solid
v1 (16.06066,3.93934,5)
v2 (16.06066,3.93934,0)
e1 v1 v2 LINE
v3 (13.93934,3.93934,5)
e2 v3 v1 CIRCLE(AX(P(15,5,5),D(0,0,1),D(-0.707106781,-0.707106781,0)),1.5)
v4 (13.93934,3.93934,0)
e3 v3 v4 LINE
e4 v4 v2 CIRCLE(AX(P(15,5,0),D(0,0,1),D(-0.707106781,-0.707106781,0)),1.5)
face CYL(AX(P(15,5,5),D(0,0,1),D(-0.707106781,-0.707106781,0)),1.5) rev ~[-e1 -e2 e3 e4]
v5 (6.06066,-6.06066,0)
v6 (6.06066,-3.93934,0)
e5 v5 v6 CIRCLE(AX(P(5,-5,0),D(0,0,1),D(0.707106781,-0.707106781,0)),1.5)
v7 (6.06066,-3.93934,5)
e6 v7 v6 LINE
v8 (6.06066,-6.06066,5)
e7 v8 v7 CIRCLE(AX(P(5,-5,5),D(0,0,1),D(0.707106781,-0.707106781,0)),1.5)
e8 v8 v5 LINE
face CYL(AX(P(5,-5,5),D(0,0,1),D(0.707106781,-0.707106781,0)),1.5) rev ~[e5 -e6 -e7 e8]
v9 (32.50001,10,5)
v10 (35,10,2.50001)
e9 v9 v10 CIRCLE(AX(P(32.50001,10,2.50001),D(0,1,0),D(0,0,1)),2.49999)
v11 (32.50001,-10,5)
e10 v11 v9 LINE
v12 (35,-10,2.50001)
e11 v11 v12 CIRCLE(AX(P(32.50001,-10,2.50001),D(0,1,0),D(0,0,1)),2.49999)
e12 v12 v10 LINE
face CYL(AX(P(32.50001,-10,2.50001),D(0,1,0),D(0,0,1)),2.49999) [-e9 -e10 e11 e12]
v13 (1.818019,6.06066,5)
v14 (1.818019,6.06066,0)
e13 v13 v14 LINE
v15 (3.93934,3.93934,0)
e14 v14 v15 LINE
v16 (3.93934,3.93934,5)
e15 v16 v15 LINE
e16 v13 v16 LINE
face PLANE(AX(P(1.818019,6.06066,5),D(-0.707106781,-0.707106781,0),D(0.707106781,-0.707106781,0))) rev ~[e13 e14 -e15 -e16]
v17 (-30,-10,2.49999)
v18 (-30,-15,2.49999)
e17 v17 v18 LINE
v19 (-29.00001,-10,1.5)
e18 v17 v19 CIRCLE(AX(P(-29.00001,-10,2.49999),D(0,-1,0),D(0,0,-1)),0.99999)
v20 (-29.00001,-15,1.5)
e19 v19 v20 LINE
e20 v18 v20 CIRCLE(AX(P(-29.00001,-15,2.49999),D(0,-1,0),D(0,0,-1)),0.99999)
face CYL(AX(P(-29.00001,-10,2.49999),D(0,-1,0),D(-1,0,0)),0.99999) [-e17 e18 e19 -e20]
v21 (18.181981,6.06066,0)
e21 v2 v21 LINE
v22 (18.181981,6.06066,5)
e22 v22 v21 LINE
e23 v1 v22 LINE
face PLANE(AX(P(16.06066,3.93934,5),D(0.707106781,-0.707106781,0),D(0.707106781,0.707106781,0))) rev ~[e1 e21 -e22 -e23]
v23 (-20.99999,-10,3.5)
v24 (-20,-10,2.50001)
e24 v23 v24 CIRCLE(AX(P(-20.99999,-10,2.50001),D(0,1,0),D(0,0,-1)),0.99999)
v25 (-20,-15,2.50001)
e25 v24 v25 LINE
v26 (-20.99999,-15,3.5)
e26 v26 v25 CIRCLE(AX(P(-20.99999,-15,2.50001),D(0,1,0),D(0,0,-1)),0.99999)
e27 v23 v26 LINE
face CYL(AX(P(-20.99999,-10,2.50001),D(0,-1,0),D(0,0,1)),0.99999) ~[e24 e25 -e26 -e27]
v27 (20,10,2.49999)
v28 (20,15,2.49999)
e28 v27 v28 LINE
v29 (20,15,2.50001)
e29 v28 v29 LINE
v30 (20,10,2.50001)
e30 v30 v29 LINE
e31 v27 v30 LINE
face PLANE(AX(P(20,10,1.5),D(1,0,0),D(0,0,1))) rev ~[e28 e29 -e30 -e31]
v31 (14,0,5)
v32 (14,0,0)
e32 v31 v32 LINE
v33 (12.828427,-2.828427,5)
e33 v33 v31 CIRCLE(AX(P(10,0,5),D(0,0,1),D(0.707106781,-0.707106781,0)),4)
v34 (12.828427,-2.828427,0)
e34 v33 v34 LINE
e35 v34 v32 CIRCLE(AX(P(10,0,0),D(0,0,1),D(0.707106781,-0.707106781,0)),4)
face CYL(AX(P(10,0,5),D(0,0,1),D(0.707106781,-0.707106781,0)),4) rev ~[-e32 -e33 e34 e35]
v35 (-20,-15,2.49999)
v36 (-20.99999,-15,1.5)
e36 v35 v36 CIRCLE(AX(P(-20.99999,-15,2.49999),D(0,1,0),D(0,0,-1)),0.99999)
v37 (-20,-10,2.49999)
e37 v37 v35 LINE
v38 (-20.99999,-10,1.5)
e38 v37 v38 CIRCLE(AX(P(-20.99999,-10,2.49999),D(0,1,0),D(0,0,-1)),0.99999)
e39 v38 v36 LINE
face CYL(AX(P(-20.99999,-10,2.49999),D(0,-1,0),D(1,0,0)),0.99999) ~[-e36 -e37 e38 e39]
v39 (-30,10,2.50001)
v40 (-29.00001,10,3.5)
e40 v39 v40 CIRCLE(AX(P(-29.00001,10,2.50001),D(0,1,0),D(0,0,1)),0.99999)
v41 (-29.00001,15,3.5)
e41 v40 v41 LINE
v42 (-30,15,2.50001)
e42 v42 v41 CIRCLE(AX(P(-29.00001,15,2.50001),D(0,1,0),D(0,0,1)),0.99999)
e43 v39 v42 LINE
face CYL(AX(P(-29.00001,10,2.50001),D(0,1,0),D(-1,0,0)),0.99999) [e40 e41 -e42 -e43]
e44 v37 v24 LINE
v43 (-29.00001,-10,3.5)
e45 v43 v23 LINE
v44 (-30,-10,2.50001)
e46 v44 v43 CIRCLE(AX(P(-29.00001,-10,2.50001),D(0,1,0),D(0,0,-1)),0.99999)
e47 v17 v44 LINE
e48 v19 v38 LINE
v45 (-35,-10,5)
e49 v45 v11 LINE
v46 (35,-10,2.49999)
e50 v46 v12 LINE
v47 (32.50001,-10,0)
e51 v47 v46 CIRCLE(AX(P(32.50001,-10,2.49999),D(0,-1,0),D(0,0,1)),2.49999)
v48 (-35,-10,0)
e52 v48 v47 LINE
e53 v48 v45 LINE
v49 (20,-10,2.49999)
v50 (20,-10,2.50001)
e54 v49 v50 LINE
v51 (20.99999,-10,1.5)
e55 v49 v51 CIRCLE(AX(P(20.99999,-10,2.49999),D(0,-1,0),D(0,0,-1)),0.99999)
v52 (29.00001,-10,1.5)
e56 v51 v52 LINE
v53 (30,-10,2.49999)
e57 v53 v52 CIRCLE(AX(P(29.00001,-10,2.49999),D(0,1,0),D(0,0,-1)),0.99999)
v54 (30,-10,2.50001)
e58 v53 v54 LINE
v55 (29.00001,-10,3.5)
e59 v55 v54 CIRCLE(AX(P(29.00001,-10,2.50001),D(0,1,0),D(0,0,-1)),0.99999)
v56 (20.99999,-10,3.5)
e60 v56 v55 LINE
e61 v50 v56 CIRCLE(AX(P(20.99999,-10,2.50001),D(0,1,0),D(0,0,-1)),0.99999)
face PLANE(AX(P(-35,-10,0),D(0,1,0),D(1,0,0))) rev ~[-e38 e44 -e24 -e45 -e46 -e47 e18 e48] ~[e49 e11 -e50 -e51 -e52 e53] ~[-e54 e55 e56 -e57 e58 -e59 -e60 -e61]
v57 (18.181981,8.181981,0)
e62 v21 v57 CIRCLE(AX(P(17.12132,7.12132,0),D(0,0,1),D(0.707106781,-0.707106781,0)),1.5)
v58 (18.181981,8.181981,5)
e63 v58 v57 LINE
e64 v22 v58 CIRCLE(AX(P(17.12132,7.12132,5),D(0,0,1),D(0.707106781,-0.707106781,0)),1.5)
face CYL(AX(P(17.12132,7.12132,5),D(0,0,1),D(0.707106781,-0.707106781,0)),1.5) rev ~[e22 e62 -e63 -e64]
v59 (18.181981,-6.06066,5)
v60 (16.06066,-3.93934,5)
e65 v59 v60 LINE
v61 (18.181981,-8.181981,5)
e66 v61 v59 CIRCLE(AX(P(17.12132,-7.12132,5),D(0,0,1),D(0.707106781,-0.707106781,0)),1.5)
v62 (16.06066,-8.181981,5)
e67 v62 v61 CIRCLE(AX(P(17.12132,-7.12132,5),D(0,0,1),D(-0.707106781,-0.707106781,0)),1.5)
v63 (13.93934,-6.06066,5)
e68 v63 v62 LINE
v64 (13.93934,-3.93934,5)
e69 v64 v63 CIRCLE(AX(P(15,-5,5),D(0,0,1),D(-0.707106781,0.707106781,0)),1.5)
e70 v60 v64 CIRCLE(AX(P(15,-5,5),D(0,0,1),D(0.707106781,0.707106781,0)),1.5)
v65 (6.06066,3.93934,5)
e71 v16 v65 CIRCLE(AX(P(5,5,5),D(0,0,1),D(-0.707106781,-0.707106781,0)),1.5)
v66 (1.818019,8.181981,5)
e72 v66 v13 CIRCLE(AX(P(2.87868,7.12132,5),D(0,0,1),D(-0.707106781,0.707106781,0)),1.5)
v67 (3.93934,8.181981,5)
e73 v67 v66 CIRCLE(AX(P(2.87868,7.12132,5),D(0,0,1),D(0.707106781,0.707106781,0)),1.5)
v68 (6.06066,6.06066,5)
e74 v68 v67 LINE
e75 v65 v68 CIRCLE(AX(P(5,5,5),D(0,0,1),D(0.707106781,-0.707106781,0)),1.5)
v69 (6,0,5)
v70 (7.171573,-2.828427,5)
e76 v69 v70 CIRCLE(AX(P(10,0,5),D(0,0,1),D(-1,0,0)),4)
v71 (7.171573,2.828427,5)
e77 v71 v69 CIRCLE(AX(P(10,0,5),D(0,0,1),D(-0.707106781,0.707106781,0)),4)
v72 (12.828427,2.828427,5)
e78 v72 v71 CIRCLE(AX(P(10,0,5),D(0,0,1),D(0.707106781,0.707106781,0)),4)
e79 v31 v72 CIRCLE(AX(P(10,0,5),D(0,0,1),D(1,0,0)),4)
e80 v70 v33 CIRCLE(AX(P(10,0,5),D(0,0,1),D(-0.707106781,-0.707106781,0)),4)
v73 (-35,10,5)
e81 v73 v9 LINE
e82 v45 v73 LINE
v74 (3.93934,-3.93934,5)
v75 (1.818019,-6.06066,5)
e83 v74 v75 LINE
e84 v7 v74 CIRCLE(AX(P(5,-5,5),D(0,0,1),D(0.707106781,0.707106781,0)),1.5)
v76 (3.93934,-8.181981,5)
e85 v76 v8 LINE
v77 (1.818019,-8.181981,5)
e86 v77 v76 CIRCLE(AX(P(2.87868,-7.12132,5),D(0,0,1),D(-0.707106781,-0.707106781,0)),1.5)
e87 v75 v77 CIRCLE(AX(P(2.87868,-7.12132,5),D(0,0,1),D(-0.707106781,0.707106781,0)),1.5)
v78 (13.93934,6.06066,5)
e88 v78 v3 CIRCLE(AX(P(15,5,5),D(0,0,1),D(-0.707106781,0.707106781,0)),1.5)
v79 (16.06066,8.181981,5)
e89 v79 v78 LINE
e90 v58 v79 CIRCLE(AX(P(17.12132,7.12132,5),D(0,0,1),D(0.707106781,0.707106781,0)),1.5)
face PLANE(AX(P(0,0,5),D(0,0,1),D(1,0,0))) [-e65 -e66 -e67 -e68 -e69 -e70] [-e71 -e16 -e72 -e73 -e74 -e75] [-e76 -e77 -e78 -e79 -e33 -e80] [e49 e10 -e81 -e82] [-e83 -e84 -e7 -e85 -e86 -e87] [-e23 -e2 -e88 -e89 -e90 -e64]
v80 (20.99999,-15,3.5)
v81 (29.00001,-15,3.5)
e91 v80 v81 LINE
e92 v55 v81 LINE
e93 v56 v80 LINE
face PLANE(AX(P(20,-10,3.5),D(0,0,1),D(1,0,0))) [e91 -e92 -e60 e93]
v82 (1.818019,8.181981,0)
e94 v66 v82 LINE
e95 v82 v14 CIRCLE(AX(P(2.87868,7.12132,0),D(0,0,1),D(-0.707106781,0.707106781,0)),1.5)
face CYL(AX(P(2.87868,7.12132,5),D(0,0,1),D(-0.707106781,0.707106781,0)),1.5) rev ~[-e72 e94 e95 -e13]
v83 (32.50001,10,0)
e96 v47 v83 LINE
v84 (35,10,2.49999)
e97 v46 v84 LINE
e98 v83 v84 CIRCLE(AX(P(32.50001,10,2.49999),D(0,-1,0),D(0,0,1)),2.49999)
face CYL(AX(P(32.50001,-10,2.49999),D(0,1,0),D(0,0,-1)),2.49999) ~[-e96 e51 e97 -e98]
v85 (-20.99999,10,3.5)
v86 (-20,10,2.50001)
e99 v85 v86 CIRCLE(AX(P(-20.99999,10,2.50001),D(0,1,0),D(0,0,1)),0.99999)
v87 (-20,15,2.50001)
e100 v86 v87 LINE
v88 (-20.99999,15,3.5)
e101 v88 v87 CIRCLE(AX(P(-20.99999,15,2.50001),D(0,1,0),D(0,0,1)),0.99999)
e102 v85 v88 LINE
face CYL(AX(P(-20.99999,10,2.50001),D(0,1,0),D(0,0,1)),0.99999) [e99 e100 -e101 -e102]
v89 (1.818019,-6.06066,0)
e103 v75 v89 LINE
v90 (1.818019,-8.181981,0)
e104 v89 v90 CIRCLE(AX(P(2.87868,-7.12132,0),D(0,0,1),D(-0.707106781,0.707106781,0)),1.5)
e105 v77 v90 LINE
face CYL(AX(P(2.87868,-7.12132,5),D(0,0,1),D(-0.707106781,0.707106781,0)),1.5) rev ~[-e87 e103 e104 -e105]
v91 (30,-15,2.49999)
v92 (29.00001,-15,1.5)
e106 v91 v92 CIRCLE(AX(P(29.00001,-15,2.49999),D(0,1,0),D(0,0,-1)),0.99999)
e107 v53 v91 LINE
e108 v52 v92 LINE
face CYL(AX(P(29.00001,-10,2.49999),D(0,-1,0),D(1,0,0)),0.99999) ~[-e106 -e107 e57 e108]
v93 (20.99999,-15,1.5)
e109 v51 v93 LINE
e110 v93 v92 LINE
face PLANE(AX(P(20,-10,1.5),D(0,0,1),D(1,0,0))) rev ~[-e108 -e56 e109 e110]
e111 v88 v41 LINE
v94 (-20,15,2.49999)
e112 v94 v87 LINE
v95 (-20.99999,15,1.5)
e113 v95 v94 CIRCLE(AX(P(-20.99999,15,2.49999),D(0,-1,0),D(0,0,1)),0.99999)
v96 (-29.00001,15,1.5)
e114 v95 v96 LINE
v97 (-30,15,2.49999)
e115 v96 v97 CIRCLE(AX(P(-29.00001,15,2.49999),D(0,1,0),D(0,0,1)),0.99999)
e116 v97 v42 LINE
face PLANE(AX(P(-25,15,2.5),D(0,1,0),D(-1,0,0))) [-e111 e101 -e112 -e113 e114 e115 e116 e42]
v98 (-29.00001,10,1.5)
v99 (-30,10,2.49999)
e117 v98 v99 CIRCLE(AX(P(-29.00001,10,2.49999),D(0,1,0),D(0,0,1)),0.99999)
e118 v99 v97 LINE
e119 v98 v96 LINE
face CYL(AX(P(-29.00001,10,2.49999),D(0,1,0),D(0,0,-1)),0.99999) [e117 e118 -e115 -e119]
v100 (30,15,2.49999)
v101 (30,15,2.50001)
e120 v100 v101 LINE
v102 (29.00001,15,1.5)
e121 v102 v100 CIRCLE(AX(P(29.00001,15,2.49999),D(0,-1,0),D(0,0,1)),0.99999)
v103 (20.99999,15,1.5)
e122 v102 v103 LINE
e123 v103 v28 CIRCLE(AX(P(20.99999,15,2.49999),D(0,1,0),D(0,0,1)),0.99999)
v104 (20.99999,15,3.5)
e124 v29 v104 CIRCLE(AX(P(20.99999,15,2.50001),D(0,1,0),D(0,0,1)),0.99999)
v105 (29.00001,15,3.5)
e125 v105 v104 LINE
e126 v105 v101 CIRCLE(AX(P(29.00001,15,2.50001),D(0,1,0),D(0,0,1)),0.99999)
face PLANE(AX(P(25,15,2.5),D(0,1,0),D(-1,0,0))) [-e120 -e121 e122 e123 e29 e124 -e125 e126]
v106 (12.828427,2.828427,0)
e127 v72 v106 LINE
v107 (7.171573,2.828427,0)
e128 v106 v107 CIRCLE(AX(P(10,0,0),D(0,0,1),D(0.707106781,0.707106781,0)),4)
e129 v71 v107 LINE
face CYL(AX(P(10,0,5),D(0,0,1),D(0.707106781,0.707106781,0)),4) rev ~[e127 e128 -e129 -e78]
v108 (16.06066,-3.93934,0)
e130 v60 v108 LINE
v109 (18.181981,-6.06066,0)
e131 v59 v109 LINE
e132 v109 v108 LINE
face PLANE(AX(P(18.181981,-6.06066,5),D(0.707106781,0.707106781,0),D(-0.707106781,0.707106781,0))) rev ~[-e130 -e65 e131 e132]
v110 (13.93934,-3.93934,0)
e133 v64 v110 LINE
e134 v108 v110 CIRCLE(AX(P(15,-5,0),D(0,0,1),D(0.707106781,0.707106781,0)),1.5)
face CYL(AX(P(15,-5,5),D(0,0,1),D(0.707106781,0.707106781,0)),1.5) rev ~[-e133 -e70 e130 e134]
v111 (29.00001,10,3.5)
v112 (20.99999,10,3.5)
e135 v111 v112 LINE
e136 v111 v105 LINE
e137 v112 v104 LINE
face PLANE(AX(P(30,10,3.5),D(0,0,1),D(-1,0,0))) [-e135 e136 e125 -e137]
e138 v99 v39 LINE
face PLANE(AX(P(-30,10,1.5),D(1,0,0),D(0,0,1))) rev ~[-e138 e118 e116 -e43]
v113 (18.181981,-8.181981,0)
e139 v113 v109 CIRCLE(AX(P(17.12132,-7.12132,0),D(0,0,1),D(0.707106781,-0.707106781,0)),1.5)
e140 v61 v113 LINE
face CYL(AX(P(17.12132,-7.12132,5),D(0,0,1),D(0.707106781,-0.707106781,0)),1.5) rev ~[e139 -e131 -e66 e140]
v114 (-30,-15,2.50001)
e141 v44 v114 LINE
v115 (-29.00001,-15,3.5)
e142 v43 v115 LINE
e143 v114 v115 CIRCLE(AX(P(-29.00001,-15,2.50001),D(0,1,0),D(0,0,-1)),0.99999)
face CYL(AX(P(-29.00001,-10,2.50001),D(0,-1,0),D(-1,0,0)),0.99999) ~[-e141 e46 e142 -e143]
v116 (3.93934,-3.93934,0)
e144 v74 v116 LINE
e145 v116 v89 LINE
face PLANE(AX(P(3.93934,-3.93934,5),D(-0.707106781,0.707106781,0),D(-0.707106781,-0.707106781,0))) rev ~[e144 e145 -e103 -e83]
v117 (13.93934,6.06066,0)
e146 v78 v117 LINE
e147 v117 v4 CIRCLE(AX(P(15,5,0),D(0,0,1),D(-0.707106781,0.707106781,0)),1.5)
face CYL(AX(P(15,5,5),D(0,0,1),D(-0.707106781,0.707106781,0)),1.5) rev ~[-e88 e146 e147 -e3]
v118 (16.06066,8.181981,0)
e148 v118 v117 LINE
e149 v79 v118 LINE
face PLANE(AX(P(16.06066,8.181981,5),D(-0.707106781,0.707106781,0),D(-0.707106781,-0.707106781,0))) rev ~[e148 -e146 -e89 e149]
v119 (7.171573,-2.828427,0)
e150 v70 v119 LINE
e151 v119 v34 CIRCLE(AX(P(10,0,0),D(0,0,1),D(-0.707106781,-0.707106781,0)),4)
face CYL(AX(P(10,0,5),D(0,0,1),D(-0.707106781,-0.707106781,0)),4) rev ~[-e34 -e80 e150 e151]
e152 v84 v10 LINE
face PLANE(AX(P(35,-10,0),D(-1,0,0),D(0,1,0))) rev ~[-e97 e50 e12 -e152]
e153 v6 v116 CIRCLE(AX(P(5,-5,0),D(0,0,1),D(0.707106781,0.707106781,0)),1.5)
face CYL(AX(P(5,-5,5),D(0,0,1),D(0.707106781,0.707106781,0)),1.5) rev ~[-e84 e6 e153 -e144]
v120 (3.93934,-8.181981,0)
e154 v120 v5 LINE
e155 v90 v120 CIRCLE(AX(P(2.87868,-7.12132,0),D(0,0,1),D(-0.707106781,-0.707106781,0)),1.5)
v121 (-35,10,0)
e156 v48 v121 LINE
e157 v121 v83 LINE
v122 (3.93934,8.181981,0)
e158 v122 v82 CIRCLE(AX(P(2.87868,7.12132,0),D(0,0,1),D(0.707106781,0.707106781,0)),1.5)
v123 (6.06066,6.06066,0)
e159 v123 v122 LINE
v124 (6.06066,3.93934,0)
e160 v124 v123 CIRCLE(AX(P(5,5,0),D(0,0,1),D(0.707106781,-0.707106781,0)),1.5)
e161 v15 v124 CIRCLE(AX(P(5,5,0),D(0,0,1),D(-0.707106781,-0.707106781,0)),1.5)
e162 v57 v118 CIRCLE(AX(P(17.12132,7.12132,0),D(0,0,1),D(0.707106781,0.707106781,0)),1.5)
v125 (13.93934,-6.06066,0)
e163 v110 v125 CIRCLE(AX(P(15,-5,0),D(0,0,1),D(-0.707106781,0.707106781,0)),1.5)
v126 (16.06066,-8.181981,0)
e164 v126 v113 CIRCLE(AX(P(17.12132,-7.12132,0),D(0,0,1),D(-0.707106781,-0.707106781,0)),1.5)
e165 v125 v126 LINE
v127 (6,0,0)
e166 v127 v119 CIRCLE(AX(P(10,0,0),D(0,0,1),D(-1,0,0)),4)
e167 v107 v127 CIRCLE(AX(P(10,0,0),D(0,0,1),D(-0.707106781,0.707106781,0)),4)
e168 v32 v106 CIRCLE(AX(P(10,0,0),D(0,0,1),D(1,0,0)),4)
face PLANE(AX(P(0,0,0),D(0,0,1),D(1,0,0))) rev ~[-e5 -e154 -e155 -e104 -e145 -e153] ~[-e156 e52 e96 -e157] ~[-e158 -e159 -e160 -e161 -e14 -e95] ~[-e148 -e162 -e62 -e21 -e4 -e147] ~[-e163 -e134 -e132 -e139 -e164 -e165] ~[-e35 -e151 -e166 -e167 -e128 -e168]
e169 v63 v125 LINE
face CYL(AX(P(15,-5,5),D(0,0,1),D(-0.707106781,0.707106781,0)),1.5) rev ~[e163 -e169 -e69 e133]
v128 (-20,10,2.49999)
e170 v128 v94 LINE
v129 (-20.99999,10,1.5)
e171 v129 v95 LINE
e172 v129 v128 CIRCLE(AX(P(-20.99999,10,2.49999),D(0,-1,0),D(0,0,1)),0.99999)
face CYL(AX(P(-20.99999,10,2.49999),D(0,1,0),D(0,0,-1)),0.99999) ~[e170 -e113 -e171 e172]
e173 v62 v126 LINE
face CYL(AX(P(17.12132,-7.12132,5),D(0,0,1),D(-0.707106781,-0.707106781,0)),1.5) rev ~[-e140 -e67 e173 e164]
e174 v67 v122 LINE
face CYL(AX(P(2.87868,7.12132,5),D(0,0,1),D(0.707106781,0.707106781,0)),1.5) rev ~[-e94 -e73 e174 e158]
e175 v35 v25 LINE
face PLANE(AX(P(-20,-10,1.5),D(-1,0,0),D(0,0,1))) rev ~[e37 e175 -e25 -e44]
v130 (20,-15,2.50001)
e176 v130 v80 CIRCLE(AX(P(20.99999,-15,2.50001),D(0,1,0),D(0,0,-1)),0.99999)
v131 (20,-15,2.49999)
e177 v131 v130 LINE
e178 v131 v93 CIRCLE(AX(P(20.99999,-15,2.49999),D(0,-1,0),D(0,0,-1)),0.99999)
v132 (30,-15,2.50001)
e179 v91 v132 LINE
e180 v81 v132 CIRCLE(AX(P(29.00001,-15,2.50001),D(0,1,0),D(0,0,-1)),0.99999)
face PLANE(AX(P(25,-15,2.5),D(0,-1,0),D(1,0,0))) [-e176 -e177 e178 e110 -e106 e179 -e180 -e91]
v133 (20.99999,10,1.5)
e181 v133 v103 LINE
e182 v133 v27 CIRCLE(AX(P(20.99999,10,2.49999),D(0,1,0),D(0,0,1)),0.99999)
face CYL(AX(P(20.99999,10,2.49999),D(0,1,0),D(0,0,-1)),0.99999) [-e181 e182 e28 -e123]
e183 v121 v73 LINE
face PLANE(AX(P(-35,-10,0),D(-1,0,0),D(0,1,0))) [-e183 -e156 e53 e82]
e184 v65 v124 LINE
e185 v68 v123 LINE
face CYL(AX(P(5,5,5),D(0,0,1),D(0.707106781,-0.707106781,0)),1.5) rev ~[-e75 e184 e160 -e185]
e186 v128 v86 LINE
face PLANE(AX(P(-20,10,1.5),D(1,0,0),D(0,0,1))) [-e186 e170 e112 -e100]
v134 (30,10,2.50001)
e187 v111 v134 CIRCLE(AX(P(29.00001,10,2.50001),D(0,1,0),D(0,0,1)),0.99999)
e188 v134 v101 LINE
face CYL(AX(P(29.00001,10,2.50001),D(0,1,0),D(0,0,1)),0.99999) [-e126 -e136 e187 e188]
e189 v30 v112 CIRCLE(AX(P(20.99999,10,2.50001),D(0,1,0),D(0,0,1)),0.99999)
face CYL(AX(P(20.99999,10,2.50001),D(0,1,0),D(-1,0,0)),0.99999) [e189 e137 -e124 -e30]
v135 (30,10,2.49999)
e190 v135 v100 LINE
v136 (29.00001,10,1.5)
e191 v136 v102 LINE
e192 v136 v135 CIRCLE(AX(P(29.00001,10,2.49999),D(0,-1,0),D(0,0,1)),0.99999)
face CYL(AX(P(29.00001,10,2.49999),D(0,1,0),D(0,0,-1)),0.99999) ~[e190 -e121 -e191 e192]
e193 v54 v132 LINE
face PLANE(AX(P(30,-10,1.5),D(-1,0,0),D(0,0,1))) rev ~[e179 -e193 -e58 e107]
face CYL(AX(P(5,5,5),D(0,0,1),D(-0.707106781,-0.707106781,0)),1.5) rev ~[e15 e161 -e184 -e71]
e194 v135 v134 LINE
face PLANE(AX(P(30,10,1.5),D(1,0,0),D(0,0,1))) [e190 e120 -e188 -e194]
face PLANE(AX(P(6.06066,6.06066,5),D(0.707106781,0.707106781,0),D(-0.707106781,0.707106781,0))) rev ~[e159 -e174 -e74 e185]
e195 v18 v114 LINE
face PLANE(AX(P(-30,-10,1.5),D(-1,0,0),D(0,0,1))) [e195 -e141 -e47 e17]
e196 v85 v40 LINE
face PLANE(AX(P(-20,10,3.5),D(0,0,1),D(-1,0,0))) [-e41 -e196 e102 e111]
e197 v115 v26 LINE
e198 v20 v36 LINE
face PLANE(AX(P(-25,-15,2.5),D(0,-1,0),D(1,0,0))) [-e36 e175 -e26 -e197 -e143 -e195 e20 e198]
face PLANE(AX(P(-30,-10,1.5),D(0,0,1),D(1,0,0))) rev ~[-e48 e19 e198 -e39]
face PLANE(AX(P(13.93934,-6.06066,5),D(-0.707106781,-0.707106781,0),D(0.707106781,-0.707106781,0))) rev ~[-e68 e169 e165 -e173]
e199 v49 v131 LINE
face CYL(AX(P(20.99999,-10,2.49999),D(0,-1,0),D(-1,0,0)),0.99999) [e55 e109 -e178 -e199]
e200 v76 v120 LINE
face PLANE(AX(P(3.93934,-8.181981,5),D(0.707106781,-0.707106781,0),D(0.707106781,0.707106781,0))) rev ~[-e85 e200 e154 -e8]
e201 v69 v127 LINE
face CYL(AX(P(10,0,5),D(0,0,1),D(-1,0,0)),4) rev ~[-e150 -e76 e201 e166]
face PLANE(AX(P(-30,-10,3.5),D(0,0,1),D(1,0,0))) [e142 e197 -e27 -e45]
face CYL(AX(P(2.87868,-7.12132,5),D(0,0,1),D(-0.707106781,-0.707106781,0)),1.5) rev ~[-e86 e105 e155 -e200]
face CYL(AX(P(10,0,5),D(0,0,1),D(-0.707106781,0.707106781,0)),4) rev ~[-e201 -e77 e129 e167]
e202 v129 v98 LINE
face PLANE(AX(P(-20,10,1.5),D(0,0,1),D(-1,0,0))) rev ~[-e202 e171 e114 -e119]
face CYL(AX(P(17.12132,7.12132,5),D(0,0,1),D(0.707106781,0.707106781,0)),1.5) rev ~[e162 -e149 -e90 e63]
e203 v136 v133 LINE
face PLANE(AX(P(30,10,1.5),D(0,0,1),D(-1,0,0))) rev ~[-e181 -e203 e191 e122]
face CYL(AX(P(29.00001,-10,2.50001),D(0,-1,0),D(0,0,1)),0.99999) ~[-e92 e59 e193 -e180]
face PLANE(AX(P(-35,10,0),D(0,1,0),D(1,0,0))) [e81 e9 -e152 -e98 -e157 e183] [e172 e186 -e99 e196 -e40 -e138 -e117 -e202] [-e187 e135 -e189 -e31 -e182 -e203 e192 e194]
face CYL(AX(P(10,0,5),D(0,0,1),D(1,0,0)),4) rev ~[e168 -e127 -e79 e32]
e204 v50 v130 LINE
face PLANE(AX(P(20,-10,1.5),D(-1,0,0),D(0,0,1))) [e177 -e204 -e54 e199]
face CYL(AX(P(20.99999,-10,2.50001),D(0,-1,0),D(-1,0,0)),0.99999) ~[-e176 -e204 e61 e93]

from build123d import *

# Parameters (mm, degrees)
F0_W     = 70
F0_H     = 20
F1_DEPTH = 5
F2_W     = 10
F2_H     = 2
F3_DEPTH = 5
F4_W     = 10
F4_H     = 2
F5_DEPTH = 5
F6_R     = 0.99999
F7_R     = 2.49999
F9_DEPTH = 5


# Not quite as in the source:
# - a fillet or chamfer is up to 0.001 mm smaller than in the source, because OpenCascade refuses the exact size


with BuildPart() as f1:
    # F0 (on Top) → F1 (new body)
    with BuildSketch(Plane.XY):
        Rectangle(F0_W, F0_H)
    extrude(amount=F1_DEPTH)

    # F2 (on face) → F3 (join)
    with BuildSketch(Plane.XZ.offset(10)):
        with Locations((-25, 2.5)):
            Rectangle(F2_W, F2_H)
        with Locations((25, 2.5)):
            Rectangle(F2_W, F2_H)
    extrude(amount=F3_DEPTH)

    # F4 (on face) → F5 (join)
    with BuildSketch(Plane(origin=(0, 10, 0), x_dir=(-1, 0, 0), z_dir=(0, 1, 0))):
        with Locations((-25, 2.5)):
            Rectangle(F4_W, F4_H)
        with Locations((25, 2.5)):
            Rectangle(F4_W, F4_H)
    extrude(amount=F5_DEPTH)

    # F6 (radius 1 in the source; OpenCascade refuses exactly that, so slightly less here)
    f6_edges = [f1.edges().sort_by_distance(p)[0] for p in [
        (30, 12.5, 3.5),
        (30, 12.5, 1.5),
        (20, 12.5, 3.5),
        (30, -12.5, 3.5),
        (30, -12.5, 1.5),
        (20, -12.5, 3.5),
        (-20, 12.5, 3.5),
        (-20, 12.5, 1.5),
        (-30, -12.5, 3.5),
        (-20, -12.5, 3.5),
        (-20, -12.5, 1.5),
        (-30, 12.5, 3.5),
        (20, 12.5, 1.5),
        (-30, 12.5, 1.5),
        (-30, -12.5, 1.5),
        (20, -12.5, 1.5),
    ]]
    fillet(f6_edges, radius=F6_R)

    # F7 (radius 2.5 in the source; OpenCascade refuses exactly that, so slightly less here)
    f7_edges = [f1.edges().sort_by_distance(p)[0] for p in [
        (35, 0, 5),
        (35, 0, 0),
    ]]
    fillet(f7_edges, radius=F7_R)

    # F8 (on face) → F9 (cut)
    with BuildSketch(Plane.XY.offset(5)):
        with BuildLine():
            Line((6.0606601718, -3.9393398282), (1.8180194847, -8.1819805153))
            ThreePointArc((1.8180194847, -8.1819805153), (2.8786796564, -8.6213203436), (3.9393398282, -8.1819805153))
            Line((3.9393398282, -8.1819805153), (6.0606601718, -6.0606601718))
            ThreePointArc((6.0606601718, -6.0606601718), (6.5, -5), (6.0606601718, -3.9393398282))
        make_face()
        with BuildLine():
            ThreePointArc((1.8180194847, -6.0606601718), (1.3786796564, -7.1213203436), (1.8180194847, -8.1819805153))
            Line((1.8180194847, -8.1819805153), (6.0606601718, -3.9393398282))
            ThreePointArc((6.0606601718, -3.9393398282), (5, -3.5), (3.9393398282, -3.9393398282))
            Line((3.9393398282, -3.9393398282), (1.8180194847, -6.0606601718))
        make_face()
        with BuildLine():
            ThreePointArc((7.1715728753, 2.8284271247), (6.30448187, 1.5307337295), (6, 0))
            Line((6, 0), (10, 0))
            Line((10, 0), (7.1715728753, 2.8284271247))
        make_face()
        with BuildLine():
            Line((10, 0), (6, 0))
            ThreePointArc((6, 0), (6.30448187, -1.5307337295), (7.1715728753, -2.8284271247))
            Line((7.1715728753, -2.8284271247), (10, 0))
        make_face()
        with BuildLine():
            Line((12.8284271247, -2.8284271247), (10, 0))
            Line((10, 0), (7.1715728753, -2.8284271247))
            ThreePointArc((7.1715728753, -2.8284271247), (10, -4), (12.8284271247, -2.8284271247))
        make_face()
        with BuildLine():
            Line((13.9393398282, -3.9393398282), (18.1819805153, -8.1819805153))
            ThreePointArc((18.1819805153, -8.1819805153), (18.6213203436, -7.1213203436), (18.1819805153, -6.0606601718))
            Line((18.1819805153, -6.0606601718), (16.0606601718, -3.9393398282))
            ThreePointArc((16.0606601718, -3.9393398282), (15, -3.5), (13.9393398282, -3.9393398282))
        make_face()
        with BuildLine():
            ThreePointArc((16.0606601718, -8.1819805153), (17.1213203436, -8.6213203436), (18.1819805153, -8.1819805153))
            Line((18.1819805153, -8.1819805153), (13.9393398282, -3.9393398282))
            ThreePointArc((13.9393398282, -3.9393398282), (13.5, -5), (13.9393398282, -6.0606601718))
            Line((13.9393398282, -6.0606601718), (16.0606601718, -8.1819805153))
        make_face()
        with BuildLine():
            ThreePointArc((18.1819805153, 6.0606601718), (18.6213203436, 7.1213203436), (18.1819805153, 8.1819805153))
            ThreePointArc((18.1819805153, 8.1819805153), (17.1213203436, 8.6213203436), (16.0606601718, 8.1819805153))
            Line((16.0606601718, 8.1819805153), (13.9393398282, 6.0606601718))
            ThreePointArc((13.9393398282, 6.0606601718), (13.5, 5), (13.9393398282, 3.9393398282))
            ThreePointArc((13.9393398282, 3.9393398282), (15, 3.5), (16.0606601718, 3.9393398282))
            Line((16.0606601718, 3.9393398282), (18.1819805153, 6.0606601718))
        make_face()
        with BuildLine():
            ThreePointArc((3.9393398282, 8.1819805153), (2.8786796564, 8.6213203436), (1.8180194847, 8.1819805153))
            ThreePointArc((1.8180194847, 8.1819805153), (1.3786796564, 7.1213203436), (1.8180194847, 6.0606601718))
            Line((1.8180194847, 6.0606601718), (3.9393398282, 3.9393398282))
            ThreePointArc((3.9393398282, 3.9393398282), (5, 3.5), (6.0606601718, 3.9393398282))
            ThreePointArc((6.0606601718, 3.9393398282), (6.5, 5), (6.0606601718, 6.0606601718))
            Line((6.0606601718, 6.0606601718), (3.9393398282, 8.1819805153))
        make_face()
        with BuildLine():
            Line((7.1715728753, 2.8284271247), (10, 0))
            Line((10, 0), (12.8284271247, 2.8284271247))
            ThreePointArc((12.8284271247, 2.8284271247), (10, 4), (7.1715728753, 2.8284271247))
        make_face()
        with BuildLine():
            Line((12.8284271247, 2.8284271247), (10, 0))
            Line((10, 0), (14, 0))
            ThreePointArc((14, 0), (13.69551813, 1.5307337295), (12.8284271247, 2.8284271247))
        make_face()
        with BuildLine():
            Line((14, 0), (10, 0))
            Line((10, 0), (12.8284271247, -2.8284271247))
            ThreePointArc((12.8284271247, -2.8284271247), (13.69551813, -1.5307337295), (14, 0))
        make_face()
    extrude(amount=-F9_DEPTH, mode=Mode.SUBTRACT)


solid = f1.part
